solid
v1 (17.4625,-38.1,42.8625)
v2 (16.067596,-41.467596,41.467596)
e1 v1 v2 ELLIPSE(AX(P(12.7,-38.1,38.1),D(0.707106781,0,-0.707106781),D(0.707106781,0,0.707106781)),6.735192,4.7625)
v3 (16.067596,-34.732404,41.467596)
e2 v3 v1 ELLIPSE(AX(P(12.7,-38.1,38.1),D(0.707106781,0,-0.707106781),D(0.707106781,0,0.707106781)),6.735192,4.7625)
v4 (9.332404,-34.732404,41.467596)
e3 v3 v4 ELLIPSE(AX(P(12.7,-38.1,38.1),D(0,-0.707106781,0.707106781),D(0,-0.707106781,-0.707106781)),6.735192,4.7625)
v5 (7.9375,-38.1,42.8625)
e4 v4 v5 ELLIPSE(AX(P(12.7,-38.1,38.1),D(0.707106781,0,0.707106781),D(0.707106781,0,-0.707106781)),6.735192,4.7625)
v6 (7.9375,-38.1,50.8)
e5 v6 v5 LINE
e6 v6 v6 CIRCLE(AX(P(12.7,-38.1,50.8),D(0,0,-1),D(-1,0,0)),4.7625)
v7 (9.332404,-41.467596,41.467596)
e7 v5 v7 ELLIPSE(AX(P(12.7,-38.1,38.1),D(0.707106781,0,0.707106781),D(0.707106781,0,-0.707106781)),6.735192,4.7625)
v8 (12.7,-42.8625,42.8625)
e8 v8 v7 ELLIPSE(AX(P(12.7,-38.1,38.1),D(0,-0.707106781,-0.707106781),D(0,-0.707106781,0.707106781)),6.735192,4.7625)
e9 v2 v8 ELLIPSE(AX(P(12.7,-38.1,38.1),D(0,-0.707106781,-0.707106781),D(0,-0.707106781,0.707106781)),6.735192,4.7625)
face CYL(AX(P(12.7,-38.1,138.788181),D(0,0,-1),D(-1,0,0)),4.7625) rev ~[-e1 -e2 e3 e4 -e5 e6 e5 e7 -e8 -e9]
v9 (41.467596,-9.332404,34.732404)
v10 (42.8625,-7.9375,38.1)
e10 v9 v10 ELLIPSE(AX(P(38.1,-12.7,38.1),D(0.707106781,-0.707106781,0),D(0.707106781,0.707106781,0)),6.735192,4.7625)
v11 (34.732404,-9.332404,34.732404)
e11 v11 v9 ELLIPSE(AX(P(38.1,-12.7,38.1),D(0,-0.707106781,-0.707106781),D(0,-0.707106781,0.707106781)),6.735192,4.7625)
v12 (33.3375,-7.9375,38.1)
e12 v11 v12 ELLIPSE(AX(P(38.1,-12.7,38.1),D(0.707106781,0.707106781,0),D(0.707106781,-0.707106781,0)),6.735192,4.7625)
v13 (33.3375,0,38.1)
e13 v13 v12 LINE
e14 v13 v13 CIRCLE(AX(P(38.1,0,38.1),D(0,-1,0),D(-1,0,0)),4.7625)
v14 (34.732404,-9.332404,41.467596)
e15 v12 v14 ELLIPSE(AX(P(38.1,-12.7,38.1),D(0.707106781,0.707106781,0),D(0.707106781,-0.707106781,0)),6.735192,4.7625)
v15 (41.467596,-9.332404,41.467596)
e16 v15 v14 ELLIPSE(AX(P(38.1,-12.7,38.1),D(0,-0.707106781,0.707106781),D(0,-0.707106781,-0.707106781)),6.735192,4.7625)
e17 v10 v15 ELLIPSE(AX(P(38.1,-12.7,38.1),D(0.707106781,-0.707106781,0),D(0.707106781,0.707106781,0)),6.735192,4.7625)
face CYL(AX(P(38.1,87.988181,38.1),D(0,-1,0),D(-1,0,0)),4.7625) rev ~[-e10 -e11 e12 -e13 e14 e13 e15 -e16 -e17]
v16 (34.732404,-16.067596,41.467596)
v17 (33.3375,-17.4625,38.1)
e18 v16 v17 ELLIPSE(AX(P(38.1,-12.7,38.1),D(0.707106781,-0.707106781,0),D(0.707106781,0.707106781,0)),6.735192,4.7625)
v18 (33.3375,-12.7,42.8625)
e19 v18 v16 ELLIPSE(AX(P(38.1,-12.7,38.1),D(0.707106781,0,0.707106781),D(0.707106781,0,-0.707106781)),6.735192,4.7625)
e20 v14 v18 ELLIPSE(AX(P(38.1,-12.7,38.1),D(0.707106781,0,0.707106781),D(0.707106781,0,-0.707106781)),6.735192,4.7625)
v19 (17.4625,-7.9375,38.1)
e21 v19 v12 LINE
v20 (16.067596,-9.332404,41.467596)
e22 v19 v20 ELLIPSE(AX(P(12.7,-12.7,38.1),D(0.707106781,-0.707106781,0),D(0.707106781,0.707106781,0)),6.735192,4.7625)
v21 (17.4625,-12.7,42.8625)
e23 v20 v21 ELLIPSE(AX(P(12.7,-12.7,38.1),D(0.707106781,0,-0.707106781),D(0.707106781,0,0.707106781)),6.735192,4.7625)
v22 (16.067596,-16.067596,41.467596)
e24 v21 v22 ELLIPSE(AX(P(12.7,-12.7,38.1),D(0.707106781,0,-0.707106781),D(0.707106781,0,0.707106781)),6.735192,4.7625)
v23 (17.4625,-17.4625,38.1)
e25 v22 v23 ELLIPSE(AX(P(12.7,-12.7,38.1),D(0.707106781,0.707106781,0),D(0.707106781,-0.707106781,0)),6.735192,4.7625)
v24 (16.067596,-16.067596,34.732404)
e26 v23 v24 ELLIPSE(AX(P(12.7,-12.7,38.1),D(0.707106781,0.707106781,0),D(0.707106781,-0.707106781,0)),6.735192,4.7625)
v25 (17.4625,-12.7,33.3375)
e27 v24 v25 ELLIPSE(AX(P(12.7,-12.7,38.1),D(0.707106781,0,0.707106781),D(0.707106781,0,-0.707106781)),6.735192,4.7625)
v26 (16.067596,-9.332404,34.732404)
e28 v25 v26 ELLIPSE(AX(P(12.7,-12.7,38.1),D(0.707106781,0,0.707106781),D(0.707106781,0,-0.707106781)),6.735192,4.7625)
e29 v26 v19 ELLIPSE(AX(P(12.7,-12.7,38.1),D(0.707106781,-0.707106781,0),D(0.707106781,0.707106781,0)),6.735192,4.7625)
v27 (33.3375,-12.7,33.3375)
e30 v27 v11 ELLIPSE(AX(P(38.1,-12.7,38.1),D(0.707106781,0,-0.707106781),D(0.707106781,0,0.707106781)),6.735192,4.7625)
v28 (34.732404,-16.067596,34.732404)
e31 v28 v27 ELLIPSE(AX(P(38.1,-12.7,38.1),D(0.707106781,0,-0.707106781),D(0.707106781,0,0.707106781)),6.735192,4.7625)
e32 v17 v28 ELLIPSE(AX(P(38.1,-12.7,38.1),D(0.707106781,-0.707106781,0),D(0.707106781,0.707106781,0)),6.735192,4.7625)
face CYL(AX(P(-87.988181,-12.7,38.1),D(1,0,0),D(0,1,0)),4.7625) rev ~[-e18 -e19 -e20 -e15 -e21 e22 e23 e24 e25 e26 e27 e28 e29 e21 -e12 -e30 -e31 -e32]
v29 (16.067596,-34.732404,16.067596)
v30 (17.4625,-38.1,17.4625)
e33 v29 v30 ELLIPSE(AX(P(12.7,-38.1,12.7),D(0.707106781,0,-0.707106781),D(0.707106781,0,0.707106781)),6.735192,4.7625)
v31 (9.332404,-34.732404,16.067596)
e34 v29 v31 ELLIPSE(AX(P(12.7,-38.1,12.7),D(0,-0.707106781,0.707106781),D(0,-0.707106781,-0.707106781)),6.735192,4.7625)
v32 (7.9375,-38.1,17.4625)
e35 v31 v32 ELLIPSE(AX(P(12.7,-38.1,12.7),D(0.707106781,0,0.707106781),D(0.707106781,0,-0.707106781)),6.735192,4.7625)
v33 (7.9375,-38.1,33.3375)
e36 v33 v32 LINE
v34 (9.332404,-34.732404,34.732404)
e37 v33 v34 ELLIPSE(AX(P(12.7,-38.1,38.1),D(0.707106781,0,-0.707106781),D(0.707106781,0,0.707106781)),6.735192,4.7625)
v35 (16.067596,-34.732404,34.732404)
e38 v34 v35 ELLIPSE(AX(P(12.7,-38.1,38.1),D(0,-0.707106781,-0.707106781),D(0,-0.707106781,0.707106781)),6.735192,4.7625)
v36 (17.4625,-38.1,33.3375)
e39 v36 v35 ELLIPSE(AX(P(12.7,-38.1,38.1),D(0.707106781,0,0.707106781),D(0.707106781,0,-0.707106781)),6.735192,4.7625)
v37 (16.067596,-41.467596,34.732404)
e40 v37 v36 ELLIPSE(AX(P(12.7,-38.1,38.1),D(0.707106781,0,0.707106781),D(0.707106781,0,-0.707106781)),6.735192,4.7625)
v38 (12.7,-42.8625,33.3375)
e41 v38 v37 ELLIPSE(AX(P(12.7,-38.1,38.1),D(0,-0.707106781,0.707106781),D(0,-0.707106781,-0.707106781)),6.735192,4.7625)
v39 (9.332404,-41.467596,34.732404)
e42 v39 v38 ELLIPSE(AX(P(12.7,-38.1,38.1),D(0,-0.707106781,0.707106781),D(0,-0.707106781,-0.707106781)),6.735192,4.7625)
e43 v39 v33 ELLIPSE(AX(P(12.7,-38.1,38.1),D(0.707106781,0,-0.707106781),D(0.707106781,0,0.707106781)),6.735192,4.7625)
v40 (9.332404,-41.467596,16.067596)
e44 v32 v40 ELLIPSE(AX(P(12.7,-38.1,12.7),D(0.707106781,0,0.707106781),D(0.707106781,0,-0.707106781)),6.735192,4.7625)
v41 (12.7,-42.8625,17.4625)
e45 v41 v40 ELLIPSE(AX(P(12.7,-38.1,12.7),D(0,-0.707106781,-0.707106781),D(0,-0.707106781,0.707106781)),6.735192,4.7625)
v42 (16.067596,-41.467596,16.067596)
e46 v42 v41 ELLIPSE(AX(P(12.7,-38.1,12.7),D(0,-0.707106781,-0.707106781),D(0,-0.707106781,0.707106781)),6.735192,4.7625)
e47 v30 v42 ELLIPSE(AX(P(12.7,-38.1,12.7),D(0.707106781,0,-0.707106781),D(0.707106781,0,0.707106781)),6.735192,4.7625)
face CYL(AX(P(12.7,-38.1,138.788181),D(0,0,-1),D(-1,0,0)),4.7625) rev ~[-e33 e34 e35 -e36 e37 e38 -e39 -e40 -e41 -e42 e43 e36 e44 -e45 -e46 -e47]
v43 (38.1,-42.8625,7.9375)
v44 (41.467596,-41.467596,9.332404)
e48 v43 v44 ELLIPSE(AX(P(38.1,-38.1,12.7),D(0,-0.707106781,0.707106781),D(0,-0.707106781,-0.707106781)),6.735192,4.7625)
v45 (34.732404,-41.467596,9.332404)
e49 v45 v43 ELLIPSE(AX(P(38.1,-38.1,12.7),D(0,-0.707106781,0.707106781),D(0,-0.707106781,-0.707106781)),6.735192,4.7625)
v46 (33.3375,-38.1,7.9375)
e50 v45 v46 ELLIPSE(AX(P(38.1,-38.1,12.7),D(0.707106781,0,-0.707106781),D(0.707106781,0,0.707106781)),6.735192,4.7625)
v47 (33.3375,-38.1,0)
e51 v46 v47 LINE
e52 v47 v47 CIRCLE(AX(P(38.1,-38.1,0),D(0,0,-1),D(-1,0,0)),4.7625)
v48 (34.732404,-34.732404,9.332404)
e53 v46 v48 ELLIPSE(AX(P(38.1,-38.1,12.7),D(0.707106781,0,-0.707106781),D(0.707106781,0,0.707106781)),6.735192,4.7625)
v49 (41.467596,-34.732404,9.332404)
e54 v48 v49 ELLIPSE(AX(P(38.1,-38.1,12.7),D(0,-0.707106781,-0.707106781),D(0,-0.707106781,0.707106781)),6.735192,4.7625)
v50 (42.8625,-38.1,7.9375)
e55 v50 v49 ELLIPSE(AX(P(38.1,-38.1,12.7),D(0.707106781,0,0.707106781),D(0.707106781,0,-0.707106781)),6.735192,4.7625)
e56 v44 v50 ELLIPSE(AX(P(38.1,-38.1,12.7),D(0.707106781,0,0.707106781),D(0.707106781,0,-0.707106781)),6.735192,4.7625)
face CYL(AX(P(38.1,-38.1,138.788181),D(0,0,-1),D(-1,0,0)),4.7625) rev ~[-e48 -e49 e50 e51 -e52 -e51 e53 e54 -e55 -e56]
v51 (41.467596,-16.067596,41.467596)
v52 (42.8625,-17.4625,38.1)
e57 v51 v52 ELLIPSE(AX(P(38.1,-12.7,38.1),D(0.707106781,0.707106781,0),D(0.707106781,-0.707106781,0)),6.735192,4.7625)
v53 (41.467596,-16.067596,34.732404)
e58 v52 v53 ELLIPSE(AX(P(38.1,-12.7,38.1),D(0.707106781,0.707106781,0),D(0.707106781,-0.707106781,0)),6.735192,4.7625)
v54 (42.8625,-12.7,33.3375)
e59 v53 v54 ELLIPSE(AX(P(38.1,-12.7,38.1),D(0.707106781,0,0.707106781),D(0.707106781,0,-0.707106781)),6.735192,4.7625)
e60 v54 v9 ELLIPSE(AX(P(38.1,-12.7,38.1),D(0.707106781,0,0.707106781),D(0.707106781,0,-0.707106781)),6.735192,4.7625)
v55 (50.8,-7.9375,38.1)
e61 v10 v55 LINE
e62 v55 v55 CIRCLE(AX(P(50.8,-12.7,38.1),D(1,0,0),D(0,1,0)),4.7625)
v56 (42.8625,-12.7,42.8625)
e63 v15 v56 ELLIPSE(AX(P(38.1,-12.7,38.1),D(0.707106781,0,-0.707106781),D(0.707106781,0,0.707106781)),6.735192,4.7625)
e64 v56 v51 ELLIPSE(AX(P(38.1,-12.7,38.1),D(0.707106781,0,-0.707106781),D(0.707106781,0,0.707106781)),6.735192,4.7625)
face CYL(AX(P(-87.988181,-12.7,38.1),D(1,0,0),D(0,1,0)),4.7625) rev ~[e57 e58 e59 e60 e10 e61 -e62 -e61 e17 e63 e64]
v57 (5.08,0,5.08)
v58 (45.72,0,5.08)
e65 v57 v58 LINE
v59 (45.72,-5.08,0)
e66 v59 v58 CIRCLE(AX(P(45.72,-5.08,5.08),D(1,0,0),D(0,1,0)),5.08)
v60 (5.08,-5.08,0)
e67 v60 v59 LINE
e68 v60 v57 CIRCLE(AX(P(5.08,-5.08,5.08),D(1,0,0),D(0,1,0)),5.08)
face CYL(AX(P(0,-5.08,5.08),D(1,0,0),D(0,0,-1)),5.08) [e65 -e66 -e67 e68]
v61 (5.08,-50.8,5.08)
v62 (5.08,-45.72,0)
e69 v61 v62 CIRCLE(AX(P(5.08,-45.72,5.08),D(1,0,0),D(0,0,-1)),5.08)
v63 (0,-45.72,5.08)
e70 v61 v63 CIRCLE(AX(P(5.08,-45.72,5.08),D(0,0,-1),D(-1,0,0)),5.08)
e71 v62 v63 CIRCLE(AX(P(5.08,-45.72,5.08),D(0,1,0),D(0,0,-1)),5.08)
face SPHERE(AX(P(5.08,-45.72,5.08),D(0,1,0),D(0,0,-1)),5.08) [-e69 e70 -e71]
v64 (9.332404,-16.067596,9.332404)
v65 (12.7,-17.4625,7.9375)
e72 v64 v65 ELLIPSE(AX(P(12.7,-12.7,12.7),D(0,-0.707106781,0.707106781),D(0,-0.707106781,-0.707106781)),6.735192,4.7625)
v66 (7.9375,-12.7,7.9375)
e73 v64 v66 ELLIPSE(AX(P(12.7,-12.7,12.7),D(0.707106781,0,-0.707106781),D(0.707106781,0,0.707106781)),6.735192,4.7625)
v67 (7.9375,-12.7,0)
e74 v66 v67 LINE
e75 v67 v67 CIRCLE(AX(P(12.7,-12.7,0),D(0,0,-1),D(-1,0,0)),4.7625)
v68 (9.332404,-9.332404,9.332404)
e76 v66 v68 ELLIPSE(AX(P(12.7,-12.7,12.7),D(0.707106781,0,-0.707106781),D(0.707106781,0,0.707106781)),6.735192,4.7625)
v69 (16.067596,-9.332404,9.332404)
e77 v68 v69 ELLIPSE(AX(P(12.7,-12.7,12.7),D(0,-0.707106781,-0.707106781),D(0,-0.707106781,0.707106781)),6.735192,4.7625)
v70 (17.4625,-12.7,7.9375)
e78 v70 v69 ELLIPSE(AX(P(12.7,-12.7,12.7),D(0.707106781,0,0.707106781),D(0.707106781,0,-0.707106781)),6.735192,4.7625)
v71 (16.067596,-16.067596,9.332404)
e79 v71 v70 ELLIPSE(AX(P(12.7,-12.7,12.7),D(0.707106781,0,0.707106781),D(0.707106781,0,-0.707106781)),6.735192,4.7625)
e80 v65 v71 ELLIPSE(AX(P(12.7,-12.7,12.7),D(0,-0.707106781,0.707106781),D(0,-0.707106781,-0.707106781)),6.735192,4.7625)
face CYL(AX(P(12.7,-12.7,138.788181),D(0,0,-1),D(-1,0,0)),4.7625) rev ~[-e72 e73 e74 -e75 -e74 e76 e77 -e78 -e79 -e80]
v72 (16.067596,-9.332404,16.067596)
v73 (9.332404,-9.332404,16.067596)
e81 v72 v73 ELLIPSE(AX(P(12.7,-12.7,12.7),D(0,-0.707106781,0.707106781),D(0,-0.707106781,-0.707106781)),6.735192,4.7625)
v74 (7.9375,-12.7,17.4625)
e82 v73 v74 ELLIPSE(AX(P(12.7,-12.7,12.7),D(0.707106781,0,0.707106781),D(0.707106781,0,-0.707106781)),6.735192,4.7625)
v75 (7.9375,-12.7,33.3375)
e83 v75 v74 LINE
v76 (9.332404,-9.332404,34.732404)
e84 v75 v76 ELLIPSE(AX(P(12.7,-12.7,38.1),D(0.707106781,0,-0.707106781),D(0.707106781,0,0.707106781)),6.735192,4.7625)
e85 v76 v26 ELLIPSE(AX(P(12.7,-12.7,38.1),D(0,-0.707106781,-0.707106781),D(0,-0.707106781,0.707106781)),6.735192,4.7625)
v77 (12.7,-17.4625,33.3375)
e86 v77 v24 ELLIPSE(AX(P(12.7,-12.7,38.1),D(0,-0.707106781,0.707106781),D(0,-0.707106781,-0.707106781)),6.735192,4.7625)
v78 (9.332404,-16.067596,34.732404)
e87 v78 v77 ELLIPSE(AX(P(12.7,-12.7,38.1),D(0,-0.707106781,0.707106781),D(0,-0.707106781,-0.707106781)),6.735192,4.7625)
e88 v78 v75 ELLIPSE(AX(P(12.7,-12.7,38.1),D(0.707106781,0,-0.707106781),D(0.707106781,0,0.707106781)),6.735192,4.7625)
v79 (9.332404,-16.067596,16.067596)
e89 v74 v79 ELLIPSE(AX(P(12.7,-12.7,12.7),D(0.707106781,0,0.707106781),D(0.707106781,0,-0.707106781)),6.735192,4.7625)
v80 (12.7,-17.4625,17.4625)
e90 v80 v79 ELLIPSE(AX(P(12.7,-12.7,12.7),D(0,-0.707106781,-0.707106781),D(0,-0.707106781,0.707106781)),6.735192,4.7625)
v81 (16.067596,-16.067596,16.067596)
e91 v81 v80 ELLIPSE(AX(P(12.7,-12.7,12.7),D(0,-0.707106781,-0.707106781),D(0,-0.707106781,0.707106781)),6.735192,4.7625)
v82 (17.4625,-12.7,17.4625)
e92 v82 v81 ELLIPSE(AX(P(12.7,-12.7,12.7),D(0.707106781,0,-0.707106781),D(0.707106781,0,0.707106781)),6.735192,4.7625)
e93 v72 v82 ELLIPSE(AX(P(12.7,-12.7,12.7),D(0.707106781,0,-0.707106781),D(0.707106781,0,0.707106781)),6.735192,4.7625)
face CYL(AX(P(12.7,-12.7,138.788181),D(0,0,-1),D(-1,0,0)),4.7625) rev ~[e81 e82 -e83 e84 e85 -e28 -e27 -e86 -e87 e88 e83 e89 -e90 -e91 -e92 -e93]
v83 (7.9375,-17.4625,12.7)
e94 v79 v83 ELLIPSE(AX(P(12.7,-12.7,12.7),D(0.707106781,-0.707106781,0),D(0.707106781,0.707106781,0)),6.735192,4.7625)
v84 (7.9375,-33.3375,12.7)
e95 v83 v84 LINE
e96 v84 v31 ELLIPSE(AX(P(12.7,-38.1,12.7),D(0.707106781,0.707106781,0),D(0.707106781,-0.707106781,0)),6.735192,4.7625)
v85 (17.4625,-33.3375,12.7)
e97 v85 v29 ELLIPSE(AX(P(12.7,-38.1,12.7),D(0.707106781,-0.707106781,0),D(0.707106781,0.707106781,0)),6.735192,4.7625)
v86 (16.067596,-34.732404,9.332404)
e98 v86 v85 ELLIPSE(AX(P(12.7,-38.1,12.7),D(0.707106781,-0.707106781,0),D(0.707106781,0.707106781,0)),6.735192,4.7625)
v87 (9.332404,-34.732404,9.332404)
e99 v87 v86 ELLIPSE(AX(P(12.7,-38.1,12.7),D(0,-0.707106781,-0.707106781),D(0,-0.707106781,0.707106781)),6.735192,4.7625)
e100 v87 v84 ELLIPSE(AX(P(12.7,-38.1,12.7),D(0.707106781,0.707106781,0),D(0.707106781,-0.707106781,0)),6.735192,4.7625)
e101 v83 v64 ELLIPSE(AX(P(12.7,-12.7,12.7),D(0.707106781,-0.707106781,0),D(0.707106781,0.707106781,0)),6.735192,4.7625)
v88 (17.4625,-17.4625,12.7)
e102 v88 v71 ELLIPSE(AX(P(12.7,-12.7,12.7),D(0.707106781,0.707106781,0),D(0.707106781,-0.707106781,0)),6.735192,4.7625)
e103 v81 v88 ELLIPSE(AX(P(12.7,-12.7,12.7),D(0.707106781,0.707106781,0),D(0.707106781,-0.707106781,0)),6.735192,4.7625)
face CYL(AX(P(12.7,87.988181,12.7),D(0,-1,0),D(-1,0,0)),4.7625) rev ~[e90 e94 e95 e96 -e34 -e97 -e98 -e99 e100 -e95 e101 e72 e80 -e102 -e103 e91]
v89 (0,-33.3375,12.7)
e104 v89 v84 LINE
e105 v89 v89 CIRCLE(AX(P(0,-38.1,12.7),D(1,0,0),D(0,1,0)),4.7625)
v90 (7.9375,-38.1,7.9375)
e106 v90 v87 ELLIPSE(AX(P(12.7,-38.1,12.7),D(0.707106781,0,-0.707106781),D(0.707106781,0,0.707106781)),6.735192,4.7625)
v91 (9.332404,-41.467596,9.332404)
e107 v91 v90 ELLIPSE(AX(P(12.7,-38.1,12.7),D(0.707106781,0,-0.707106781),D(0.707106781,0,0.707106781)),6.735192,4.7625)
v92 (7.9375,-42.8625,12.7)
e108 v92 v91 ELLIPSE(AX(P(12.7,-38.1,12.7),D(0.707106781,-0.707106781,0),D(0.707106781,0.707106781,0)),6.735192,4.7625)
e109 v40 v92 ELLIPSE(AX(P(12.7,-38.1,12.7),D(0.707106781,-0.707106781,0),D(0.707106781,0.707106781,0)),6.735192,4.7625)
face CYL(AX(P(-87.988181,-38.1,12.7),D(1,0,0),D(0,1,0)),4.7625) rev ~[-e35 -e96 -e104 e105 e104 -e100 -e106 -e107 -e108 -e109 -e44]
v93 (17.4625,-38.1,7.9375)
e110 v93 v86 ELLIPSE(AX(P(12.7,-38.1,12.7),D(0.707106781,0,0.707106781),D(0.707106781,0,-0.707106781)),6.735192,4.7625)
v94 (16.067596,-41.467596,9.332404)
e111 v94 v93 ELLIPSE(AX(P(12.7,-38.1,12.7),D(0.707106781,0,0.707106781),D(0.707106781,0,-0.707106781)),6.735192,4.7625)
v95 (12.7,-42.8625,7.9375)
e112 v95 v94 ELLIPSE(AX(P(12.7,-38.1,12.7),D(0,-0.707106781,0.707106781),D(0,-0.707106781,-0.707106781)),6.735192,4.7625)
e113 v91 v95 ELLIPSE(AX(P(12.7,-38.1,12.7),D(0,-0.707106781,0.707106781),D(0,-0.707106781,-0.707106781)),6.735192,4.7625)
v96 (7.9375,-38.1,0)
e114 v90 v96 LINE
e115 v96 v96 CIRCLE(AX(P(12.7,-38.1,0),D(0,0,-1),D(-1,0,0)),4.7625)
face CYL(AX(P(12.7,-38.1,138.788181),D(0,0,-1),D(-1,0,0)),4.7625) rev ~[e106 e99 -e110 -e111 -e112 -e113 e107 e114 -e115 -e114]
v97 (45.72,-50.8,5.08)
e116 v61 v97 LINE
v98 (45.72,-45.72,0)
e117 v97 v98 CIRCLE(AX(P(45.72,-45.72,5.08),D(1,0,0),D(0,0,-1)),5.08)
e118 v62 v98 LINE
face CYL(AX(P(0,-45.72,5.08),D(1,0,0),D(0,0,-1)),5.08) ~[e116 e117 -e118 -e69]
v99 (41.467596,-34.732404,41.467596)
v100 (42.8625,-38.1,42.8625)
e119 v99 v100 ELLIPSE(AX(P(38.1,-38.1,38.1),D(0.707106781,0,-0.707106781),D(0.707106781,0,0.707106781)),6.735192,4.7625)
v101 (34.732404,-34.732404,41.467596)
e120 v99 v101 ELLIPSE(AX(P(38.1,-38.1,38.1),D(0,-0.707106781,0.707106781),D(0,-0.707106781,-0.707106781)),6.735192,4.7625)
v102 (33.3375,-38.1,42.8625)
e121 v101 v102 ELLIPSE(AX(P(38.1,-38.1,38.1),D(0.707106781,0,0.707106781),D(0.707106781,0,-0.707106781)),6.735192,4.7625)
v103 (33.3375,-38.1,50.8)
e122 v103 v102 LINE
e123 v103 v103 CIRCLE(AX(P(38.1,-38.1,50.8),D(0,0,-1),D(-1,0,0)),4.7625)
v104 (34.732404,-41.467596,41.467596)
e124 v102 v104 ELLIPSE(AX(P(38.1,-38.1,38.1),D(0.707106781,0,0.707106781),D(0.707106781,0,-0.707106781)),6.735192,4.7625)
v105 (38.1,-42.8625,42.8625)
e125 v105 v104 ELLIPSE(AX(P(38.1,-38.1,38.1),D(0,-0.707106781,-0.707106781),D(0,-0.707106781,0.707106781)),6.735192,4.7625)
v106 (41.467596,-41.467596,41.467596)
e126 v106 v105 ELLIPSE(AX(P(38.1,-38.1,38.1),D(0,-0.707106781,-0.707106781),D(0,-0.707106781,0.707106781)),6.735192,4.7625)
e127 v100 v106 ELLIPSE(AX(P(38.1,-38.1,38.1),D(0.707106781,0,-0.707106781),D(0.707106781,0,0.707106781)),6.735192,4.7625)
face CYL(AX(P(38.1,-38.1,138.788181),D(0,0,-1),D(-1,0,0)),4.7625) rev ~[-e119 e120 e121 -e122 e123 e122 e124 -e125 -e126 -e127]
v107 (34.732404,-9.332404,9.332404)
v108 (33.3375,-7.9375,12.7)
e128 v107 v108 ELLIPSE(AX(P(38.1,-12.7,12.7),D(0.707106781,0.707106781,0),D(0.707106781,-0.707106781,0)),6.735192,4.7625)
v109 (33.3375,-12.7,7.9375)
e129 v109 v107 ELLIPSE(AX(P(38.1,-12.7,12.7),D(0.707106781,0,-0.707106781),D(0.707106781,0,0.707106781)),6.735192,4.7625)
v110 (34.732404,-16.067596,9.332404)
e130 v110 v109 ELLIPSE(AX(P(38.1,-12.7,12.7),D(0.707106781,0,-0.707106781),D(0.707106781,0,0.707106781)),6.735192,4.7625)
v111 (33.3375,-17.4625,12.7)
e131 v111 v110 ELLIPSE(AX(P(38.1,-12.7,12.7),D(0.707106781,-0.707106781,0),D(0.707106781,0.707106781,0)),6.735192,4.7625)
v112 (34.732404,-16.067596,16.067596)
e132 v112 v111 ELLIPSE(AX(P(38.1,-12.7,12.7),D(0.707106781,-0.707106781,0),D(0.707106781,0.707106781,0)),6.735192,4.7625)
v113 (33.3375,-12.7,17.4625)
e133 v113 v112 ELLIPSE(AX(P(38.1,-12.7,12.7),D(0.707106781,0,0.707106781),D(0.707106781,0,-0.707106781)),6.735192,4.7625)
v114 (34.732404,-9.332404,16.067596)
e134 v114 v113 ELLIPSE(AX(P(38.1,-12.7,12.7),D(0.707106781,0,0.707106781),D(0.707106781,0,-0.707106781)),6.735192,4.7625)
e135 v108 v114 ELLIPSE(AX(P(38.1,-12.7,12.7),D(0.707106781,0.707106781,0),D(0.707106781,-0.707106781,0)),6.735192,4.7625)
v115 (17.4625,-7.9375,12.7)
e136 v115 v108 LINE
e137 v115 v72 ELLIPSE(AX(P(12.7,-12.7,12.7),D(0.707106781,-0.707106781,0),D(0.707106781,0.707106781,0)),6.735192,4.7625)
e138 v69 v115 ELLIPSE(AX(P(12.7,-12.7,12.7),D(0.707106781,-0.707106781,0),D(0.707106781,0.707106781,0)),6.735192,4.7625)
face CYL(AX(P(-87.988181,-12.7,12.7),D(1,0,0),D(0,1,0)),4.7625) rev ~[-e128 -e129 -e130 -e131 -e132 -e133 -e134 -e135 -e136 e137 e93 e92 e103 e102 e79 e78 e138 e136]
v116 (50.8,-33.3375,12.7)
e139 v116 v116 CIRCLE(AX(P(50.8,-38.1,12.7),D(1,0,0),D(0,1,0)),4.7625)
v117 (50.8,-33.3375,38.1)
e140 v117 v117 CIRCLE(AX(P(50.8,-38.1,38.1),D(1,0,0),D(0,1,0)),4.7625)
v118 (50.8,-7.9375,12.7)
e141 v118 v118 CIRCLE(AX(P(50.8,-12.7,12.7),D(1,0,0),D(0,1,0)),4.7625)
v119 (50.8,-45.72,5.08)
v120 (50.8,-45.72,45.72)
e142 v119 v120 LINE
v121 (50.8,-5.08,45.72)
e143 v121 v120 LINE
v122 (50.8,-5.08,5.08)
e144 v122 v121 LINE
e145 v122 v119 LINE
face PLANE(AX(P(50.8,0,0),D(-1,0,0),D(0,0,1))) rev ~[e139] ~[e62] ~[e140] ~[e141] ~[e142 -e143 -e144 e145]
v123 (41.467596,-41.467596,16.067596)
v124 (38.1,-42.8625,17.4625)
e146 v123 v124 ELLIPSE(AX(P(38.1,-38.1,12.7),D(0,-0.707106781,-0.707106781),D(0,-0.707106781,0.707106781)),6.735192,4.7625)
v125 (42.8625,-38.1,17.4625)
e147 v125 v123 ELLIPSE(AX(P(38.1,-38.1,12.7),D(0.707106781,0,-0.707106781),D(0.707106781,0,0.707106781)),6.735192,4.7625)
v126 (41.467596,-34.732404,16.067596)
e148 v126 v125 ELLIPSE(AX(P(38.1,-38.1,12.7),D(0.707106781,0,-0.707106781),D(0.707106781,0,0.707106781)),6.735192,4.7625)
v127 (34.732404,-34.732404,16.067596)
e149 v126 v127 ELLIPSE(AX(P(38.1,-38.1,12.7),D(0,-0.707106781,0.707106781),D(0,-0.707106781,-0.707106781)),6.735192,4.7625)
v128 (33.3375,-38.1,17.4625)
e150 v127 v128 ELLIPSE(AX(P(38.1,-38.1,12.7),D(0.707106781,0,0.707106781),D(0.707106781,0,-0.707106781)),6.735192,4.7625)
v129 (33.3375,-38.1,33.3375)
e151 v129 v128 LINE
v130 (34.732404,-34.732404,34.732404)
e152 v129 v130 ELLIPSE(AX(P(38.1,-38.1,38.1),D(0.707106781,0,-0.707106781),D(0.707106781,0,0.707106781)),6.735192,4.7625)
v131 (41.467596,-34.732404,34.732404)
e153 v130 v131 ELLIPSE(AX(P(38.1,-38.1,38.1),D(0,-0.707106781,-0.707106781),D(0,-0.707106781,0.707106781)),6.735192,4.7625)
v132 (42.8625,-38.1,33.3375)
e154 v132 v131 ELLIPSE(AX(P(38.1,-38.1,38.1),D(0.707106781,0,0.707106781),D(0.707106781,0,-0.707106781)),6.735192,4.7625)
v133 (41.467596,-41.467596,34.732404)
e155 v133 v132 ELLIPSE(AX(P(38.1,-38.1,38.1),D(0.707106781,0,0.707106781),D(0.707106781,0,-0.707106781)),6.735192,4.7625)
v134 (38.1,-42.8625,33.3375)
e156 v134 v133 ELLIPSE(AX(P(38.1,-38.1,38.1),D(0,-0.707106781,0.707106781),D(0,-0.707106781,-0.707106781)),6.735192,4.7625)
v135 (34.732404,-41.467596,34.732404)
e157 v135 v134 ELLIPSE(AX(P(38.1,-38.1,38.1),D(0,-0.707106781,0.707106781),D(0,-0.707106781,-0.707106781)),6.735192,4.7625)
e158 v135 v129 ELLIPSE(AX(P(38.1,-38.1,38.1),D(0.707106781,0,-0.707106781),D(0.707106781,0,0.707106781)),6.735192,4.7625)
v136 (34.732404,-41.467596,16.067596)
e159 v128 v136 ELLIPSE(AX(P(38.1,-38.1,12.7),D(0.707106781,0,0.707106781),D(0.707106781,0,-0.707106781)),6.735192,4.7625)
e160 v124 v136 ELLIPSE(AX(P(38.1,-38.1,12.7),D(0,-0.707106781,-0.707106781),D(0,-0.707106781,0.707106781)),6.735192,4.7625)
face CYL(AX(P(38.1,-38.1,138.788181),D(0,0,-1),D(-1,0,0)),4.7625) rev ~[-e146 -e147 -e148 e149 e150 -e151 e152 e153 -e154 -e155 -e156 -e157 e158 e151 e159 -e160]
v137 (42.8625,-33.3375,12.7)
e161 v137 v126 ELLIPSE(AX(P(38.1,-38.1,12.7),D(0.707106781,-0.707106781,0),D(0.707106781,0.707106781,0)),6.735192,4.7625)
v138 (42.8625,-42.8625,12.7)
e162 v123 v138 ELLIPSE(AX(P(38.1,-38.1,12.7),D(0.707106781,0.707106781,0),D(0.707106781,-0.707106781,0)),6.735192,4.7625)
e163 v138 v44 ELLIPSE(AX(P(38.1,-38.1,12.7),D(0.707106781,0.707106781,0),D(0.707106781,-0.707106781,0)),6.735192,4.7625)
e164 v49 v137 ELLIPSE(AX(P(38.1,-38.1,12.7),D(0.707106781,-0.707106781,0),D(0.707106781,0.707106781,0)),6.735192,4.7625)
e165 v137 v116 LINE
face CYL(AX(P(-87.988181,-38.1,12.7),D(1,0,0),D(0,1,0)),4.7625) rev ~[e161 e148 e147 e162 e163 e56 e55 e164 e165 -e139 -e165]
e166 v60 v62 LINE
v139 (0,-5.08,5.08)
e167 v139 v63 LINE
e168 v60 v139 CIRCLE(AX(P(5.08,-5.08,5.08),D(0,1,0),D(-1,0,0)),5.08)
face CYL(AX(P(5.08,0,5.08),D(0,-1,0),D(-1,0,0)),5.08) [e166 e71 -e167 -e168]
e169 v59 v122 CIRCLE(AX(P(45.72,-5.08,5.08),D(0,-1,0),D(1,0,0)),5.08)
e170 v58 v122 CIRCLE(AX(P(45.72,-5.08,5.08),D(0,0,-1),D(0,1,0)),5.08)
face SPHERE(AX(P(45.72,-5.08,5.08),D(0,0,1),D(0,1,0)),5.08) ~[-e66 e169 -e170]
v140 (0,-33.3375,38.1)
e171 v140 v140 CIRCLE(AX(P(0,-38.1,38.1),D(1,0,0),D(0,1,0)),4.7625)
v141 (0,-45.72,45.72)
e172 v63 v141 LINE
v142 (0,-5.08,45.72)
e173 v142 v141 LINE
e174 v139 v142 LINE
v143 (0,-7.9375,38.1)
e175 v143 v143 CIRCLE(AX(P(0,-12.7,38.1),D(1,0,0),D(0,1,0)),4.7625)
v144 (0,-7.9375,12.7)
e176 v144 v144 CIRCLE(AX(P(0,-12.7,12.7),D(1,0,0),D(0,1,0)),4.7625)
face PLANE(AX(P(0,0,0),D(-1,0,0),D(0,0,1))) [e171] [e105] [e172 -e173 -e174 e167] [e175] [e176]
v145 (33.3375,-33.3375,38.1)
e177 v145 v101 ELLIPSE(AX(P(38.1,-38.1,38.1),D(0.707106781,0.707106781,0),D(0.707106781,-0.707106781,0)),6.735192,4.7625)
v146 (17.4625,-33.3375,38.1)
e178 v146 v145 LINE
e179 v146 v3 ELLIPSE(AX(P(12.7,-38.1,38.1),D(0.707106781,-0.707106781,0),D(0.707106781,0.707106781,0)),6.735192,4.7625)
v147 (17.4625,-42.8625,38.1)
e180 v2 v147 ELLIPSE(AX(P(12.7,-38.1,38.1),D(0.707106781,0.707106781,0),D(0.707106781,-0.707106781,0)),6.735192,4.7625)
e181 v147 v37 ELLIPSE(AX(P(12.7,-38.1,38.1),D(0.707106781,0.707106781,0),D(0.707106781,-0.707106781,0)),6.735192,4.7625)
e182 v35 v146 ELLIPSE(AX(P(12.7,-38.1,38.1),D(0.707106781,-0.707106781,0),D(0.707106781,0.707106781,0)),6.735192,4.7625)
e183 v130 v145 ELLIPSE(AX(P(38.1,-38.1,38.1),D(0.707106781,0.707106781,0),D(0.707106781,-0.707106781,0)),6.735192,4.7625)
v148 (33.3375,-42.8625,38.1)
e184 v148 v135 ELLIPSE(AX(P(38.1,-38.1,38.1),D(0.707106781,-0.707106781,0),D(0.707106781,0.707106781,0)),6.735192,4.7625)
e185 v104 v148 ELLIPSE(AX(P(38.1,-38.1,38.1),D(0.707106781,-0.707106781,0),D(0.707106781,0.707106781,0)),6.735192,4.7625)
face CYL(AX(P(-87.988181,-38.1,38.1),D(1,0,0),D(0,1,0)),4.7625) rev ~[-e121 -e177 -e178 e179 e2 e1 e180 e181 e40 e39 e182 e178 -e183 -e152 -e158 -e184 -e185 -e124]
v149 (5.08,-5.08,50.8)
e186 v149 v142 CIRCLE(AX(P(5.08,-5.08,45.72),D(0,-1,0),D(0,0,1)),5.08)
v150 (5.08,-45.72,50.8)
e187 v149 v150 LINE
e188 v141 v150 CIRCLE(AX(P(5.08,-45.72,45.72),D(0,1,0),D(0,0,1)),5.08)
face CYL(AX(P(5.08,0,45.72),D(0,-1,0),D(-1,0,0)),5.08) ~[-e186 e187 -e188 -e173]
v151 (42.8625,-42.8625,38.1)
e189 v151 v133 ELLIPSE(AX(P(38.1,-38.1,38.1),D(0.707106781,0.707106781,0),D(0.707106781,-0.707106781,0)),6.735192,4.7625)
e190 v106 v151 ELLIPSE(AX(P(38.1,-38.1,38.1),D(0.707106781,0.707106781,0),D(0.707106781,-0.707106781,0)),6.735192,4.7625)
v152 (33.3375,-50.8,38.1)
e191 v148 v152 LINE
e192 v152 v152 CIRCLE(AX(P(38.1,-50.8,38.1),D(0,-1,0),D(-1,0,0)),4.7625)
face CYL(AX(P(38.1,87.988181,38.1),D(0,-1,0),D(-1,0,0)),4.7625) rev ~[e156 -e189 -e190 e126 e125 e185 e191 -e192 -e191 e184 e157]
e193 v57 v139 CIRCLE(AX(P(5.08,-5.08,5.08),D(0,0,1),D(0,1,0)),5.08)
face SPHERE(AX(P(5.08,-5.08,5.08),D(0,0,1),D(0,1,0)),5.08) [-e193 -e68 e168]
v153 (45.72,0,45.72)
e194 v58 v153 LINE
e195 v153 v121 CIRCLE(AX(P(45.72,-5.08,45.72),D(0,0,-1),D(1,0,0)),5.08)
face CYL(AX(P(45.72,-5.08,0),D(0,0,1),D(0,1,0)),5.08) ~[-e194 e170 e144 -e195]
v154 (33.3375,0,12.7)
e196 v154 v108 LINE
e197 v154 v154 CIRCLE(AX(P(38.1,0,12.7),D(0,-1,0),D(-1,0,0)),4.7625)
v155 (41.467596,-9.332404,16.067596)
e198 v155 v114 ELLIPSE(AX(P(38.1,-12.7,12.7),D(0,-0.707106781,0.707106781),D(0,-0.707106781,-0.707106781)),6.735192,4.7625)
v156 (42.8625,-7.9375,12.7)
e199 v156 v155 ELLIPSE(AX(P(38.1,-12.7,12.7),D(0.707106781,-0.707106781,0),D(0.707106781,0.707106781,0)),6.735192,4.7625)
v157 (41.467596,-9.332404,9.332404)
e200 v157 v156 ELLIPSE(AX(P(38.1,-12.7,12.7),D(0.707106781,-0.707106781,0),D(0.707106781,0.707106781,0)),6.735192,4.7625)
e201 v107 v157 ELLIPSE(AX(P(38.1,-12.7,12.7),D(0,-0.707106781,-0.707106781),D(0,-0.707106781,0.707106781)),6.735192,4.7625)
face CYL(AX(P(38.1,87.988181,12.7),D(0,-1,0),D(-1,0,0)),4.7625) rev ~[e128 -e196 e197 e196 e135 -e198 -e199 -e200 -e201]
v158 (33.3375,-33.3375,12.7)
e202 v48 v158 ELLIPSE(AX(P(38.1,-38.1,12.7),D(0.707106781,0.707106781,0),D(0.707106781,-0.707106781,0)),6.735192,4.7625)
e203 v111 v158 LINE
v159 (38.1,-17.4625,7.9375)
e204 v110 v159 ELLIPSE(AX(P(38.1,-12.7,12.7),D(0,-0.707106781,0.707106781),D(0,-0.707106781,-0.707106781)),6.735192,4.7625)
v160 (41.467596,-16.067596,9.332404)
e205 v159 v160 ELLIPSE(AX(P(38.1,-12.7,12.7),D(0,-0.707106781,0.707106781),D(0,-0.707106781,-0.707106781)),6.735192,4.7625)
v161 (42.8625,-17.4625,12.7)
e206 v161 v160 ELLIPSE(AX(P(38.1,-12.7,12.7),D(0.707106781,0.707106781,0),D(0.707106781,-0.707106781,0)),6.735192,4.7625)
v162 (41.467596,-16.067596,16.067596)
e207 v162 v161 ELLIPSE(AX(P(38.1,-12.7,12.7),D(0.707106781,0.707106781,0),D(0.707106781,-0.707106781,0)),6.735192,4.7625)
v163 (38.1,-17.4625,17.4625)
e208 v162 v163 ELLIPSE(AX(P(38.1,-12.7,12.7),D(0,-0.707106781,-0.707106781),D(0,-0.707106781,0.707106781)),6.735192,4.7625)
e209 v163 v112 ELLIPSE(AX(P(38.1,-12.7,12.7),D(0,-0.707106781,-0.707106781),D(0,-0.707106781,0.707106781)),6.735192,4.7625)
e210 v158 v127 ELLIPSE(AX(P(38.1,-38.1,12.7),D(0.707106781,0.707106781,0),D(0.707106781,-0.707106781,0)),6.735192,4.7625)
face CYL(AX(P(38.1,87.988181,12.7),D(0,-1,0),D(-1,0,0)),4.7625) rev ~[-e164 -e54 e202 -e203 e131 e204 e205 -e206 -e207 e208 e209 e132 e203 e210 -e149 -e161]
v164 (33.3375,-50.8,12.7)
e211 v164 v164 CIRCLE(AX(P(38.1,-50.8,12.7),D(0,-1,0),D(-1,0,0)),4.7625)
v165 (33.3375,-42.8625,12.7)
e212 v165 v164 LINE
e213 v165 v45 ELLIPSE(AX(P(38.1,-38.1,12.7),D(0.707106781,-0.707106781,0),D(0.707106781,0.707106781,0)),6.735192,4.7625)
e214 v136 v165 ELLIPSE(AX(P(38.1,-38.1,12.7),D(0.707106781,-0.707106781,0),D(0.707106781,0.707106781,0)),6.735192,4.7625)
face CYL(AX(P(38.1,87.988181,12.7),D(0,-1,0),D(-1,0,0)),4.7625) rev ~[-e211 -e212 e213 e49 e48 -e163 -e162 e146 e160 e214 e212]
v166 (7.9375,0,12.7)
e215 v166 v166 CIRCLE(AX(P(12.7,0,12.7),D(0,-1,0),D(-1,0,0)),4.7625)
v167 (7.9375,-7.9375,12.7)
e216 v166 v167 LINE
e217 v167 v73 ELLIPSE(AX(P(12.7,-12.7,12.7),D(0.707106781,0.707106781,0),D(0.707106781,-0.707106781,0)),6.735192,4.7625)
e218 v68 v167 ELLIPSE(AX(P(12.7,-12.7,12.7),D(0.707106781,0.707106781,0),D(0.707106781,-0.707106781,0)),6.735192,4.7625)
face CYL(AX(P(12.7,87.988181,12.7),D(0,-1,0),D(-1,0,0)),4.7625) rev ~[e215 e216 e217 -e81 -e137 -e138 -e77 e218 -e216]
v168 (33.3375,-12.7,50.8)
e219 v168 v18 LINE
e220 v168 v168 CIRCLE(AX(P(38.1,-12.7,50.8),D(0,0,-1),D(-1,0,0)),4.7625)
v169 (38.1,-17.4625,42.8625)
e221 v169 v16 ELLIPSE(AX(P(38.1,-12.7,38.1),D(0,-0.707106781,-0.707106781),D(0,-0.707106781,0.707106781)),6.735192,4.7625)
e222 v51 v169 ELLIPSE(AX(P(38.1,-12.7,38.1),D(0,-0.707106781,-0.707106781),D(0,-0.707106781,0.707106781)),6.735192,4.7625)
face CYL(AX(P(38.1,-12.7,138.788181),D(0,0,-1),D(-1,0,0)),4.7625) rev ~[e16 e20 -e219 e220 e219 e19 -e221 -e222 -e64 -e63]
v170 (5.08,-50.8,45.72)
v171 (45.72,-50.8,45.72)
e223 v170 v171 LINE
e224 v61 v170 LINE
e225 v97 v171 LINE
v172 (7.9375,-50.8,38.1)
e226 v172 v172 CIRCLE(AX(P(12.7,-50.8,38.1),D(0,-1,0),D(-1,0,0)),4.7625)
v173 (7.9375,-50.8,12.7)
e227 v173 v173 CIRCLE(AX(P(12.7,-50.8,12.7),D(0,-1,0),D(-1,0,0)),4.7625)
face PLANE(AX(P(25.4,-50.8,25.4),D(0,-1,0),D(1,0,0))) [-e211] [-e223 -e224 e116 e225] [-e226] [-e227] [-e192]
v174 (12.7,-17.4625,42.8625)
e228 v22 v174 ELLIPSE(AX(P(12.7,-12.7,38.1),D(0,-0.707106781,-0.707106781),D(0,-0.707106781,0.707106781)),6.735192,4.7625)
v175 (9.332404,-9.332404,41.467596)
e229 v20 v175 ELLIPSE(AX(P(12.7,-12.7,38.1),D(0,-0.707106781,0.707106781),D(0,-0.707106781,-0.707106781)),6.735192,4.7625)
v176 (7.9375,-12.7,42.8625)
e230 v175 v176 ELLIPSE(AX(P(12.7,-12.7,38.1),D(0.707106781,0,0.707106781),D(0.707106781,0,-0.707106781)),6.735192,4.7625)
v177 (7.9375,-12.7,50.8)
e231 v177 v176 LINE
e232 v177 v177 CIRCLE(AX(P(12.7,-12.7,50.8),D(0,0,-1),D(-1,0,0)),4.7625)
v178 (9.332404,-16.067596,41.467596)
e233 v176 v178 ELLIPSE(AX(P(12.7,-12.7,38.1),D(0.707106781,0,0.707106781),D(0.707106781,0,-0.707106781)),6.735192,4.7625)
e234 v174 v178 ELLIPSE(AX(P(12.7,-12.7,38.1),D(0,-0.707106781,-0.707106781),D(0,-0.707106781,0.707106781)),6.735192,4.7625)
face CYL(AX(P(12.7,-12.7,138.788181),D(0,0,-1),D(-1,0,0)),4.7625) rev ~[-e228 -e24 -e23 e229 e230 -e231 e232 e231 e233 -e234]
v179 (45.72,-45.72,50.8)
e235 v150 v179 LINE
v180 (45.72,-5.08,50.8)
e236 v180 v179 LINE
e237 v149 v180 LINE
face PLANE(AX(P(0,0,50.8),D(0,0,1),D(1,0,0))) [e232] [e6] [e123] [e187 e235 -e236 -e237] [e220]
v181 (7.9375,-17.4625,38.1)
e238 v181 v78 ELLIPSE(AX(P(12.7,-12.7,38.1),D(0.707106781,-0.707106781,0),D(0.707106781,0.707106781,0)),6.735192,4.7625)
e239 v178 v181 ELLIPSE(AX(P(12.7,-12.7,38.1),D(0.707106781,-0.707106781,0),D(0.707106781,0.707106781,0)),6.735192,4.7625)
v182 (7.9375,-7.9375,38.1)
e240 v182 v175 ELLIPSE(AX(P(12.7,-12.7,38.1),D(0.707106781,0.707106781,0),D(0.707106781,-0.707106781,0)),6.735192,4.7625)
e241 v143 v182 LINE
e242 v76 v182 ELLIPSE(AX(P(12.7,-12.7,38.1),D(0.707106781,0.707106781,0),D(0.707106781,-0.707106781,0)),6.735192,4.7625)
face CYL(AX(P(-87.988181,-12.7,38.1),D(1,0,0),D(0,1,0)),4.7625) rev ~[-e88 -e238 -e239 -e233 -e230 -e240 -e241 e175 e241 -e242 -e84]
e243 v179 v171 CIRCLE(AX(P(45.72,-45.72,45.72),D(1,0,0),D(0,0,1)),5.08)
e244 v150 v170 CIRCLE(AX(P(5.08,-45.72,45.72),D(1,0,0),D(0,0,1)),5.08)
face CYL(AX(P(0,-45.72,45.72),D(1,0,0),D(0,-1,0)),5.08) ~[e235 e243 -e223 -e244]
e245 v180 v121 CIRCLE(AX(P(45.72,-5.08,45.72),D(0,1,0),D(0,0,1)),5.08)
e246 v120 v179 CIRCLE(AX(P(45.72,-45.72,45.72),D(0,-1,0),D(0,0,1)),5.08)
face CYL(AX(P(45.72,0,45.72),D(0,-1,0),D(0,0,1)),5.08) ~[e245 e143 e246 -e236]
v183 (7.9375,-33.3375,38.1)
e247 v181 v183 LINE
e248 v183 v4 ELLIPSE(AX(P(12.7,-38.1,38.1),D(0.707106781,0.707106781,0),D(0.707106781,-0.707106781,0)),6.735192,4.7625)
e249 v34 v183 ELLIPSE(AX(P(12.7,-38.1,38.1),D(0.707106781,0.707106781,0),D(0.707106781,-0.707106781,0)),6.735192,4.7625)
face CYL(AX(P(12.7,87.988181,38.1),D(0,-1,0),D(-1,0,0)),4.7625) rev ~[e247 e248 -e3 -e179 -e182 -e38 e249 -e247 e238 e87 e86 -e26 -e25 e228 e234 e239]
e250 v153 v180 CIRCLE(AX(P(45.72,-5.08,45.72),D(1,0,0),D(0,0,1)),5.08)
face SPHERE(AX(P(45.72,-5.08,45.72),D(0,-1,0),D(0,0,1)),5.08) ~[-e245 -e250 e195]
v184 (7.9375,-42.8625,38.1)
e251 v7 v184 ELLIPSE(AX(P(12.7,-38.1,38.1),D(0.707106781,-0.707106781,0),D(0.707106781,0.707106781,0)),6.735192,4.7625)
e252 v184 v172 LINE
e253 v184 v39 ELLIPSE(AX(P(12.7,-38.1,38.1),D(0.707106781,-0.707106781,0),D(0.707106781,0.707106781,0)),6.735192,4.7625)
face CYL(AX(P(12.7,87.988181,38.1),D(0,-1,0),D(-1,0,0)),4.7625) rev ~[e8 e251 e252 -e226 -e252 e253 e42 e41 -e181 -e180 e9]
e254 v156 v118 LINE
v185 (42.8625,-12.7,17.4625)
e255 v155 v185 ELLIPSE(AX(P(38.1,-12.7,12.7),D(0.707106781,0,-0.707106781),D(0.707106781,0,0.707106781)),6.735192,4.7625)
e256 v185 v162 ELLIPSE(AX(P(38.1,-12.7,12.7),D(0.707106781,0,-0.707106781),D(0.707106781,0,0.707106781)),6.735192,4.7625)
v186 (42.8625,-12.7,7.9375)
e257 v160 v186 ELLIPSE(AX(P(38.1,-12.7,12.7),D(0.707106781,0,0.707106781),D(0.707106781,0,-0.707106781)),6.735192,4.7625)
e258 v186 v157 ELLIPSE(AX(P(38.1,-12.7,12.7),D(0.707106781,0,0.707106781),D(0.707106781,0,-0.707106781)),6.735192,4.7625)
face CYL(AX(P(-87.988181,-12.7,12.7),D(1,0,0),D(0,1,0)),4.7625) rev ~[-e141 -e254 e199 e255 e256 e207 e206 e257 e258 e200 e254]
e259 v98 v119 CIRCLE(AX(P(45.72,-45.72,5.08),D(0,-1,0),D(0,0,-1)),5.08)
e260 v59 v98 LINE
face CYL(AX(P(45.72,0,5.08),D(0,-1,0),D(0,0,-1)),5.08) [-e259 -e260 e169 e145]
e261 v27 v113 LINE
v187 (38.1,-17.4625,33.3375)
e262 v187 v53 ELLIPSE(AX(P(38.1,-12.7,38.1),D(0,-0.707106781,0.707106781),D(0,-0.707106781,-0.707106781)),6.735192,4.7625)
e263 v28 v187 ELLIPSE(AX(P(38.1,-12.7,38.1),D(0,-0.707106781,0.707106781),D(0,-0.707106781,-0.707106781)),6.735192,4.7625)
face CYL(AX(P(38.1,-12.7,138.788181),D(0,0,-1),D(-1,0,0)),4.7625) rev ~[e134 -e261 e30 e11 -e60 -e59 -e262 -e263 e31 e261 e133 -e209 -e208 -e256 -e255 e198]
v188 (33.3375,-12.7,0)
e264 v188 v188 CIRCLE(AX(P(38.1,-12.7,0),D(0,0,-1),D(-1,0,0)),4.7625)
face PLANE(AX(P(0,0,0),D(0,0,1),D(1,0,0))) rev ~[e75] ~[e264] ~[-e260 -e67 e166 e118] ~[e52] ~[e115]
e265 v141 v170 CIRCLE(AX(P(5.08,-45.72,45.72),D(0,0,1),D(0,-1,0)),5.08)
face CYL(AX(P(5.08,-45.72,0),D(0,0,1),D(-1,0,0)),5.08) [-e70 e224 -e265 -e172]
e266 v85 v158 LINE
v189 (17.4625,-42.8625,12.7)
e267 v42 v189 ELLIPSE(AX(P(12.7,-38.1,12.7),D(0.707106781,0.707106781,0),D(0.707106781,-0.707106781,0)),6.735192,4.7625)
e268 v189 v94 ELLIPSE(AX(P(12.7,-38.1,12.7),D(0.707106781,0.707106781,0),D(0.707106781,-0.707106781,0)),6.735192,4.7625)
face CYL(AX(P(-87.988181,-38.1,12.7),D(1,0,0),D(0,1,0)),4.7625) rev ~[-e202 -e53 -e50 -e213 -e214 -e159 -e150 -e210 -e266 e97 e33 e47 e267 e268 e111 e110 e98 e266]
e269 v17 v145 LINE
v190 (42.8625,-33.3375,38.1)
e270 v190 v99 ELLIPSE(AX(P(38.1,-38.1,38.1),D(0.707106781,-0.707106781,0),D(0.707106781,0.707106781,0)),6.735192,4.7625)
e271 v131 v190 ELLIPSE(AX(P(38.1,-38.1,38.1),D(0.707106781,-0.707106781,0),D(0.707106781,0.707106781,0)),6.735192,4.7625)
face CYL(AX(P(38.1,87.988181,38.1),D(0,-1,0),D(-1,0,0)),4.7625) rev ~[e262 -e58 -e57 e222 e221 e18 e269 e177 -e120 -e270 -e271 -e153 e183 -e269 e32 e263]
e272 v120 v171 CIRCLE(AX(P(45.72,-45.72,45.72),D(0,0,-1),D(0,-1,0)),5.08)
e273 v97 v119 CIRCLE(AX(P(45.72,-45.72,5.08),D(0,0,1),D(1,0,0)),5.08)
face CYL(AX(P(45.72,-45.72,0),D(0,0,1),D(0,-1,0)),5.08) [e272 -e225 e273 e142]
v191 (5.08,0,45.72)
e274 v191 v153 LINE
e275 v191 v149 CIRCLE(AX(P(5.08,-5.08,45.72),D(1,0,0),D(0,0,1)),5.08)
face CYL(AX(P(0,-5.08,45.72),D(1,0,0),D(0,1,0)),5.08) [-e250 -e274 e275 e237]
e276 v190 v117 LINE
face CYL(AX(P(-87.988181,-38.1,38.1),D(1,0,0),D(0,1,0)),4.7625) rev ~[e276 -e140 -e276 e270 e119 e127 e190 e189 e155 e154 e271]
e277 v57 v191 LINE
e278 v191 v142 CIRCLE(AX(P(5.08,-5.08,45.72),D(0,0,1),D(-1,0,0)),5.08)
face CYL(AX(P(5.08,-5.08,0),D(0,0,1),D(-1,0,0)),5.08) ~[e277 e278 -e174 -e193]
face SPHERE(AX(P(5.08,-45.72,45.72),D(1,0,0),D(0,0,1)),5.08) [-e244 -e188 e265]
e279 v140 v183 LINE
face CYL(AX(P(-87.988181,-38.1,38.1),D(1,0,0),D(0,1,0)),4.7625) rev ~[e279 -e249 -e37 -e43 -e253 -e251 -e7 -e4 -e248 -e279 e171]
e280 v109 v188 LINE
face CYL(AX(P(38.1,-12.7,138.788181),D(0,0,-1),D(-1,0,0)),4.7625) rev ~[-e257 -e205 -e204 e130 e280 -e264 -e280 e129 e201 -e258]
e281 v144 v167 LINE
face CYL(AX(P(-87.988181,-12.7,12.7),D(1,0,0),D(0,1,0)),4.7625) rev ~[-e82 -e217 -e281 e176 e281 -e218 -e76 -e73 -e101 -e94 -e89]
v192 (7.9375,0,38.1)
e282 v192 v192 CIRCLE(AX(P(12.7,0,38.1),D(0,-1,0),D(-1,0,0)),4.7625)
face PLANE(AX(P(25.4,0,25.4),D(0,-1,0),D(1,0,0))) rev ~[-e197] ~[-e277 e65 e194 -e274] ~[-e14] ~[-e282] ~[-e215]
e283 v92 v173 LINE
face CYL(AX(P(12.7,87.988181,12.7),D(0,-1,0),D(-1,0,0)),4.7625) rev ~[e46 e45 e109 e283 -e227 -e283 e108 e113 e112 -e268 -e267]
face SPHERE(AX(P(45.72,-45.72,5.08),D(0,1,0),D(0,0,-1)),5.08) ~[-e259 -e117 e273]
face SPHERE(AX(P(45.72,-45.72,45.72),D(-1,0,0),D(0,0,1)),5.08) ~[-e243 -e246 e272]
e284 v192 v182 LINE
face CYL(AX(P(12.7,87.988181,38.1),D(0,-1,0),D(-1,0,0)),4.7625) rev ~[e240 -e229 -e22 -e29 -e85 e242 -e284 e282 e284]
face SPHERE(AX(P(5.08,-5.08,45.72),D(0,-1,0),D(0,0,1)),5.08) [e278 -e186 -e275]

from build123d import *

# Parameters (mm, degrees)
F0_W     = 50.8
F0_H     = 50.8
F1_DEPTH = 50.8
F3_D     = 9.525
F4_D     = 9.525
F6_D     = 9.525
F7_R     = 5.08


# Not quite as in the source:
# - a length typed as a fraction of an inch, garbled in the dataset ("3 / 203.2 mm" for 3/8 in), is restored


with BuildPart() as f1:
    # F0 (on Front) → F1 (new body)
    with BuildSketch(Plane.XZ):
        with Locations((25.4, 25.4)):
            Rectangle(F0_W, F0_H)
    extrude(amount=F1_DEPTH)

    # F3 (through all)
    with Locations(Plane(origin=(0, 0, 0), x_dir=(0, -1, 0), z_dir=(-1, 0, 0))):
        with Locations((12.7, 38.1), (38.1, 38.1), (38.1, 12.7), (12.7, 12.7)):
            Hole(F3_D / 2)

    # F4 (through all)
    with Locations(Plane(origin=(0, 0, 0), x_dir=(1, 0, 0), z_dir=(0, 1, 0))):
        with Locations((38.1, -38.1), (12.7, -38.1), (12.7, -12.7), (38.1, -12.7)):
            Hole(F4_D / 2)

    # F6 (through all)
    with Locations(Plane.XY.offset(50.8)):
        with Locations((12.7, -12.7), (38.1, -12.7), (38.1, -38.1), (12.7, -38.1)):
            Hole(F6_D / 2)

    # F7
    f7_edges = [f1.edges().sort_by_distance(p)[0] for p in [
        (25.4, -50.8, 50.8),
        (0, -25.4, 50.8),
        (50.8, -25.4, 50.8),
        (25.4, 0, 50.8),
        (50.8, 0, 25.4),
        (0, 0, 25.4),
        (25.4, 0, 0),
        (50.8, -25.4, 0),
        (0, -25.4, 0),
        (25.4, -50.8, 0),
        (0, -50.8, 25.4),
        (50.8, -50.8, 25.4),
    ]]
    fillet(f7_edges, radius=F7_R)


solid = f1.part
